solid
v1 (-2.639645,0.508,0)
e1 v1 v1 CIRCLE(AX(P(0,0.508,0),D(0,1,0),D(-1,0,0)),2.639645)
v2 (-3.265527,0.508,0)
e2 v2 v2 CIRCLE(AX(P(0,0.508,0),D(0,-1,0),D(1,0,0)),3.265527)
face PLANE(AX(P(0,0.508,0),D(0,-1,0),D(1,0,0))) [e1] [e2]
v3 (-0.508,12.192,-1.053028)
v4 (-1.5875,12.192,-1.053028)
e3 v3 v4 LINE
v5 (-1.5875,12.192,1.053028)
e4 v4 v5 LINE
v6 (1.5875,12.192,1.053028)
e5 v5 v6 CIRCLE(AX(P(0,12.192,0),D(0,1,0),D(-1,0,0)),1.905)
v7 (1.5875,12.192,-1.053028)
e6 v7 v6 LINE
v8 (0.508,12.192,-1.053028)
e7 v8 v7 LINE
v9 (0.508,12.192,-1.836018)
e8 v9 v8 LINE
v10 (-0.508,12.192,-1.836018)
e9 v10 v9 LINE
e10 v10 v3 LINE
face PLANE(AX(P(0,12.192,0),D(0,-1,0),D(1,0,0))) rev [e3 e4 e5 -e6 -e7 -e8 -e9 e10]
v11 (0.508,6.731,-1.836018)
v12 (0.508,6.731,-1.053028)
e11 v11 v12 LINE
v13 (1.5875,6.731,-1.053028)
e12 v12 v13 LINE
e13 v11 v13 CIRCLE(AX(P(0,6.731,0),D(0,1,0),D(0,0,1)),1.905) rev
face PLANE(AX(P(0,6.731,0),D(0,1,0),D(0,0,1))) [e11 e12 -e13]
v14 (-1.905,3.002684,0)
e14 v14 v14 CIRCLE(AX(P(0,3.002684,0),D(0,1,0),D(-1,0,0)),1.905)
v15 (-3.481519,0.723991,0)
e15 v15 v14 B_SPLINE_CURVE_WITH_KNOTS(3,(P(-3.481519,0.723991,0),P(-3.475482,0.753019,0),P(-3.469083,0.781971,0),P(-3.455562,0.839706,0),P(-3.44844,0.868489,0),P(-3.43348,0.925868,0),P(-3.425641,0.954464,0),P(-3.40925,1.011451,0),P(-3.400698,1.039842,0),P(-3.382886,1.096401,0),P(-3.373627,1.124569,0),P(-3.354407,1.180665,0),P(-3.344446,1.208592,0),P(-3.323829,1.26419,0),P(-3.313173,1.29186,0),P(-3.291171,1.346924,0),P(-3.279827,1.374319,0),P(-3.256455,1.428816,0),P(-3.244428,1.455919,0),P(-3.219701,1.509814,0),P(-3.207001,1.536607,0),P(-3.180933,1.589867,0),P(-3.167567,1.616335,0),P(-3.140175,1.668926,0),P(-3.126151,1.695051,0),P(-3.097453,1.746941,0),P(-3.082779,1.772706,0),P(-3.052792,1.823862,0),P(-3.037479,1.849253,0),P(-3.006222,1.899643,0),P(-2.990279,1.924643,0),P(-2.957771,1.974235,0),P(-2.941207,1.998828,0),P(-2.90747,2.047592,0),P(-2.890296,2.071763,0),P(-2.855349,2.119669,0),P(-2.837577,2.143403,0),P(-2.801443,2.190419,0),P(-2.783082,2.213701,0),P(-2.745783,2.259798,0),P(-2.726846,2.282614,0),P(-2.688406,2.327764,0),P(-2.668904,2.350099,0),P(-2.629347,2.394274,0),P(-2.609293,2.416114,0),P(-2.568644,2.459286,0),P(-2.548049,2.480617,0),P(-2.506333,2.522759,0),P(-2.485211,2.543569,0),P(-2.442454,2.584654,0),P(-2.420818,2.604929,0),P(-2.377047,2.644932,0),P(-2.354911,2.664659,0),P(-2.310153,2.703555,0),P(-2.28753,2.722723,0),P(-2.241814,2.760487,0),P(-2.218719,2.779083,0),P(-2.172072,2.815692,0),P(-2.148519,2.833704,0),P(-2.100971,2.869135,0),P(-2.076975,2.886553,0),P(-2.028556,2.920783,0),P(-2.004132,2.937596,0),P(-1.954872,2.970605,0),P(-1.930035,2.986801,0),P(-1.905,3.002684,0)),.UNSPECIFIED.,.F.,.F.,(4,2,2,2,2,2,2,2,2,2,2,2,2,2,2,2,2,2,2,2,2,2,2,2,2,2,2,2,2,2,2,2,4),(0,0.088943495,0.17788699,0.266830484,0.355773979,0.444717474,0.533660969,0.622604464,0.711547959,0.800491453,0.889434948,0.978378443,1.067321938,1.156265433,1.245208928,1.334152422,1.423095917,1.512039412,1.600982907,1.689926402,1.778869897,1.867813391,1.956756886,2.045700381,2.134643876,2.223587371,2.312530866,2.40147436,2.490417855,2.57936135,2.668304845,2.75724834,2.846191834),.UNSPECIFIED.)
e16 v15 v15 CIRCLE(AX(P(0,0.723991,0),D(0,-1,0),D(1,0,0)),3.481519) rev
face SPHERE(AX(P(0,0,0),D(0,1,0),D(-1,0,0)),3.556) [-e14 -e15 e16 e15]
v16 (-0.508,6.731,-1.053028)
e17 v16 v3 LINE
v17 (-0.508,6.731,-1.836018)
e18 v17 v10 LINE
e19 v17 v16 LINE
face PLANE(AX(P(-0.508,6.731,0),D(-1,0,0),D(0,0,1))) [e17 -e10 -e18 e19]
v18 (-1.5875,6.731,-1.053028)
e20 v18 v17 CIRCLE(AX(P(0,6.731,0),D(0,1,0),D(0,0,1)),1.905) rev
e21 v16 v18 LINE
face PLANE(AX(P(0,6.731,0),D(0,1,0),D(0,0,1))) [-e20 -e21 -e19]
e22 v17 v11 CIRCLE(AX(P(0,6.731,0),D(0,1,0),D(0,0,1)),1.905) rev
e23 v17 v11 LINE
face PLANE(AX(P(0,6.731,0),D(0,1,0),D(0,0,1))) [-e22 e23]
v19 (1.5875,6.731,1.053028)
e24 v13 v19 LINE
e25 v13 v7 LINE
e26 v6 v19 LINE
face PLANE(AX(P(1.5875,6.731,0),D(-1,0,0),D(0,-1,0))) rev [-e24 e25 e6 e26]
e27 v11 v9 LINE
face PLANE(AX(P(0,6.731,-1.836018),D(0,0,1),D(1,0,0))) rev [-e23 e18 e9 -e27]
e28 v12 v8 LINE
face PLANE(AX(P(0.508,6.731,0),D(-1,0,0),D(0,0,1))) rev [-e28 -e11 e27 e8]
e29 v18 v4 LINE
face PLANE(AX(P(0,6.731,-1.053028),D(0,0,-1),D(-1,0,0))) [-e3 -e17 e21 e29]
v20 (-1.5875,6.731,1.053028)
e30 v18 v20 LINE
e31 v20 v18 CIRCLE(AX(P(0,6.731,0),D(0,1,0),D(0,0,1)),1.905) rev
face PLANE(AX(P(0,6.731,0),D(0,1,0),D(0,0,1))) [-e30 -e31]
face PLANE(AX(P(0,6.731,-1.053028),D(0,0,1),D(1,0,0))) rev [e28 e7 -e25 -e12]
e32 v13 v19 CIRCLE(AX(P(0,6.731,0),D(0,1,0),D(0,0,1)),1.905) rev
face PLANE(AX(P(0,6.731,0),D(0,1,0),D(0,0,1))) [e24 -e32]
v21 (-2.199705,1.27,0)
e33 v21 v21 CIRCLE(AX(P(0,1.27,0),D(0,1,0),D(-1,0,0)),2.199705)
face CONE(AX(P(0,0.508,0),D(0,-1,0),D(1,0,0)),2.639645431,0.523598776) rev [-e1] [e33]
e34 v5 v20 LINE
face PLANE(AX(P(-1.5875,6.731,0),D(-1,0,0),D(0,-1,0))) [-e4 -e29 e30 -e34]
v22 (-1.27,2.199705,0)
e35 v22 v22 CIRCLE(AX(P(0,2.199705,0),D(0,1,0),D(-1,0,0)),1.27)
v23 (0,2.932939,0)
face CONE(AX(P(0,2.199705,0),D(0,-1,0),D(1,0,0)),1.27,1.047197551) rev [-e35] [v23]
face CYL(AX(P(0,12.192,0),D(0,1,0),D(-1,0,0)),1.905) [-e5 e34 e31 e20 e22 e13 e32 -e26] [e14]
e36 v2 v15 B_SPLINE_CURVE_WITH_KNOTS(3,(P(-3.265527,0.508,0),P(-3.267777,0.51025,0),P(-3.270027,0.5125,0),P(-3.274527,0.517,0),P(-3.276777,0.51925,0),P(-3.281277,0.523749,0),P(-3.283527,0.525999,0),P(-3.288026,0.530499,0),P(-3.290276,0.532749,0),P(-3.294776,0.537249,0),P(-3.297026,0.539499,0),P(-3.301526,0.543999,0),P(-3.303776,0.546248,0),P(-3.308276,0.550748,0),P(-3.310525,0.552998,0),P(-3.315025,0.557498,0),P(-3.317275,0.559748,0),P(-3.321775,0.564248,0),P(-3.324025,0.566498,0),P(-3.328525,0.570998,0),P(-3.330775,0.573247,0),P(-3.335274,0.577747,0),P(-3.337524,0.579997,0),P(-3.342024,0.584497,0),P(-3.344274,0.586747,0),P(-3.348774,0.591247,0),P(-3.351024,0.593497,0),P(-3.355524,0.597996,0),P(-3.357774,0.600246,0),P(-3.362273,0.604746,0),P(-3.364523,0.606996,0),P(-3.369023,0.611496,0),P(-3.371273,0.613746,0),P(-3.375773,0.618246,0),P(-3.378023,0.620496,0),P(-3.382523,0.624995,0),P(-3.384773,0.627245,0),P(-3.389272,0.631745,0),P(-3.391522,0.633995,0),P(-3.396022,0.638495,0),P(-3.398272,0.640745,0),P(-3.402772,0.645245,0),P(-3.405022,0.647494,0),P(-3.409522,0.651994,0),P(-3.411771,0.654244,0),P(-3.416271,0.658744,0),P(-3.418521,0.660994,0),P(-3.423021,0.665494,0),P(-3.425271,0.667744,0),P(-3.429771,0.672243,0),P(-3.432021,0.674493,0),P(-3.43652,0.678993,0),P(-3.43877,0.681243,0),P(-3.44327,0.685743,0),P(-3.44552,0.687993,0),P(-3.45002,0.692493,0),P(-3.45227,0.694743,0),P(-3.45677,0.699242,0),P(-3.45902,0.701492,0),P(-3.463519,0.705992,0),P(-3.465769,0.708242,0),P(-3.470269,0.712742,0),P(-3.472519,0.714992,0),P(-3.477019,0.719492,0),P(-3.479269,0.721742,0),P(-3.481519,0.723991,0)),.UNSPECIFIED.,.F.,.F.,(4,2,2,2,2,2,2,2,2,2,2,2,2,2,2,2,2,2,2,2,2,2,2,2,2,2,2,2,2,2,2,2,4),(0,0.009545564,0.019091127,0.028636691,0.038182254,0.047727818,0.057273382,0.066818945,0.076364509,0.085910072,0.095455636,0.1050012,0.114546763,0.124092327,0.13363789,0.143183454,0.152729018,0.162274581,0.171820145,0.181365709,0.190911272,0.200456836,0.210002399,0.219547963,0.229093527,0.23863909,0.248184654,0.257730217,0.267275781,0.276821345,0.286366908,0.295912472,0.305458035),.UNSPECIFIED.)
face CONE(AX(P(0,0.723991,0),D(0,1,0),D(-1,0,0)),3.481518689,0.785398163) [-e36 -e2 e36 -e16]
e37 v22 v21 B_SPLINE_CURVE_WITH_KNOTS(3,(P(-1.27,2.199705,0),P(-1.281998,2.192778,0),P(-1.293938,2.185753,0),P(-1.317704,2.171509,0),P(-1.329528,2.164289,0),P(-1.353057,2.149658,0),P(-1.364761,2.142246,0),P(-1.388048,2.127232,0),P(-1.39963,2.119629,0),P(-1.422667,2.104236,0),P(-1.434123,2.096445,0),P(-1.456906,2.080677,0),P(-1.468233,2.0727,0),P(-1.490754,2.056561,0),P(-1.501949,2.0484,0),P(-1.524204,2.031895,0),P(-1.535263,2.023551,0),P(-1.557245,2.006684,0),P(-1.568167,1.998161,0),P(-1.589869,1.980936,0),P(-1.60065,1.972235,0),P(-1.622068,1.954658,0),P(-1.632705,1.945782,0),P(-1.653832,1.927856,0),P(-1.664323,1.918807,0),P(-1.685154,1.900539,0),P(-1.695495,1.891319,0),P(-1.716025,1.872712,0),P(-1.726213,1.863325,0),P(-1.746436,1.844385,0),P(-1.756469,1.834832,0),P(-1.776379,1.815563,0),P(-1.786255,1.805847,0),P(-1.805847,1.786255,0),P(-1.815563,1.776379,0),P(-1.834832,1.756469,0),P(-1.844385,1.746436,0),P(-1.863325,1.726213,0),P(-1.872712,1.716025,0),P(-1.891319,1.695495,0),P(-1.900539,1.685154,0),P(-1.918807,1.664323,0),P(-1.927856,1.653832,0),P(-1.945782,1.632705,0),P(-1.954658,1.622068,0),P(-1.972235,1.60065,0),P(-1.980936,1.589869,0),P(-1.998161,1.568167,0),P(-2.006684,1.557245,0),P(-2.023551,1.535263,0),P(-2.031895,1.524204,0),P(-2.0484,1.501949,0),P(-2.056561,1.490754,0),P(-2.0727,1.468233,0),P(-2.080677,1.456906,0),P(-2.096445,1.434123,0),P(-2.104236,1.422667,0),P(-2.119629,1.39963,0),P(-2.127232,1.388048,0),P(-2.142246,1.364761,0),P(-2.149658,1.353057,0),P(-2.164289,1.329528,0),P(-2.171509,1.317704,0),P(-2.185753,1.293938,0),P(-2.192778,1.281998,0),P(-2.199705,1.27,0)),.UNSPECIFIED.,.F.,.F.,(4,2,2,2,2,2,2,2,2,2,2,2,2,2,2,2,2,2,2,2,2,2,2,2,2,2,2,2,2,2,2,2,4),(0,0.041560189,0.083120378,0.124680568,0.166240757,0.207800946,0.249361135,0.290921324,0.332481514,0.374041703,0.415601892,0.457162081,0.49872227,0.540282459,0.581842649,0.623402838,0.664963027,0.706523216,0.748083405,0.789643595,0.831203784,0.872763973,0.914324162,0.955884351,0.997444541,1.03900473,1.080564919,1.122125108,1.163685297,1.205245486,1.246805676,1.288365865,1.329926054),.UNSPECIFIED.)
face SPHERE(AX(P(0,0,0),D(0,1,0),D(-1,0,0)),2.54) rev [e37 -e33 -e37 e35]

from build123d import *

# Parameters (mm, degrees)
CUT_EXTRUDE1_START = -5.461
CUT_EXTRUDE1_DEPTH = 5.461
CHAMFER1_SIZE      = 0.254


with BuildPart() as part:
    # Sketch3 → Revolve1 (revolve)
    with BuildSketch(Plane.XY):
        with BuildLine():
            Line((0, 12.192), (-1.905, 12.192))
            Line((-1.905, 12.192), (-1.905, 3.002683966))
            ThreePointArc((-1.905, 3.002683966), (-2.985336827, 1.932071435), (-3.519527241, 0.508))
            Line((-3.519527241, 0.508), (-2.639645431, 0.508))
            Line((-2.639645431, 0.508), (-2.199704526, 1.27))
            ThreePointArc((-2.199704526, 1.27), (-1.796051224, 1.796051224), (-1.27, 2.199704526))
            Line((-1.27, 2.199704526), (0, 2.932939367))
            Line((0, 2.932939367), (0, 12.192))
        make_face()
    revolve(axis=Axis((0, 12.192, 0), (0, -1, 0)))

    # Sketch4 → Cut-Extrude1 (cut)
    with BuildSketch(Plane(origin=(0, 12.192, 0), x_dir=(1, 0, 0), z_dir=(0, 1, 0)).offset(CUT_EXTRUDE1_START)):
        with BuildLine():
            Line((1.5875, 1.053028371), (1.5875, -1.053028371))
            ThreePointArc((1.5875, -1.053028371), (1.905, 0), (1.5875, 1.053028371))
        make_face()
        with BuildLine():
            Line((0.508, 1.053028371), (1.5875, 1.053028371))
            ThreePointArc((1.5875, 1.053028371), (1.118502631, 1.542069021), (0.508, 1.836017701))
            Line((0.508, 1.836017701), (0.508, 1.053028371))
        make_face()
        with BuildLine():
            ThreePointArc((-1.5875, 1.053028371), (-1.905, 0), (-1.5875, -1.053028371))
            Line((-1.5875, -1.053028371), (-1.5875, 1.053028371))
        make_face()
        with BuildLine():
            Line((-0.508, 1.836017701), (0.508, 1.836017701))
            ThreePointArc((0.508, 1.836017701), (0, 1.905), (-0.508, 1.836017701))
        make_face()
        with BuildLine():
            ThreePointArc((-0.508, 1.836017701), (-1.118502631, 1.542069021), (-1.5875, 1.053028371))
            Line((-1.5875, 1.053028371), (-0.508, 1.053028371))
            Line((-0.508, 1.053028371), (-0.508, 1.836017701))
        make_face()
    extrude(amount=CUT_EXTRUDE1_DEPTH, mode=Mode.SUBTRACT)

    # Chamfer1
    # the kernel refuses this chamfer: 0.254, 0.224262667 mm, written as the material it takes off along each edge
    with BuildSketch(Plane(origin=(0, 0.508, 0), x_dir=(-1, 0, 0), z_dir=(0, 0, 1))) as chamfer1_piece_1:
        with BuildLine():
            Line((3.519527241 - CHAMFER1_SIZE, 0), (3.481518689, -0.215991448))
            ThreePointArc((3.481518689, -0.215991448), (3.501682417, -0.111157692), (3.519527241, 0))
            Line((3.519527241, 0), (3.519527241 - CHAMFER1_SIZE, 0))
        make_face()
    revolve(axis=Axis((0, 0.508, 0), (0, -1, 0)), mode=Mode.SUBTRACT)


solid = part.part
